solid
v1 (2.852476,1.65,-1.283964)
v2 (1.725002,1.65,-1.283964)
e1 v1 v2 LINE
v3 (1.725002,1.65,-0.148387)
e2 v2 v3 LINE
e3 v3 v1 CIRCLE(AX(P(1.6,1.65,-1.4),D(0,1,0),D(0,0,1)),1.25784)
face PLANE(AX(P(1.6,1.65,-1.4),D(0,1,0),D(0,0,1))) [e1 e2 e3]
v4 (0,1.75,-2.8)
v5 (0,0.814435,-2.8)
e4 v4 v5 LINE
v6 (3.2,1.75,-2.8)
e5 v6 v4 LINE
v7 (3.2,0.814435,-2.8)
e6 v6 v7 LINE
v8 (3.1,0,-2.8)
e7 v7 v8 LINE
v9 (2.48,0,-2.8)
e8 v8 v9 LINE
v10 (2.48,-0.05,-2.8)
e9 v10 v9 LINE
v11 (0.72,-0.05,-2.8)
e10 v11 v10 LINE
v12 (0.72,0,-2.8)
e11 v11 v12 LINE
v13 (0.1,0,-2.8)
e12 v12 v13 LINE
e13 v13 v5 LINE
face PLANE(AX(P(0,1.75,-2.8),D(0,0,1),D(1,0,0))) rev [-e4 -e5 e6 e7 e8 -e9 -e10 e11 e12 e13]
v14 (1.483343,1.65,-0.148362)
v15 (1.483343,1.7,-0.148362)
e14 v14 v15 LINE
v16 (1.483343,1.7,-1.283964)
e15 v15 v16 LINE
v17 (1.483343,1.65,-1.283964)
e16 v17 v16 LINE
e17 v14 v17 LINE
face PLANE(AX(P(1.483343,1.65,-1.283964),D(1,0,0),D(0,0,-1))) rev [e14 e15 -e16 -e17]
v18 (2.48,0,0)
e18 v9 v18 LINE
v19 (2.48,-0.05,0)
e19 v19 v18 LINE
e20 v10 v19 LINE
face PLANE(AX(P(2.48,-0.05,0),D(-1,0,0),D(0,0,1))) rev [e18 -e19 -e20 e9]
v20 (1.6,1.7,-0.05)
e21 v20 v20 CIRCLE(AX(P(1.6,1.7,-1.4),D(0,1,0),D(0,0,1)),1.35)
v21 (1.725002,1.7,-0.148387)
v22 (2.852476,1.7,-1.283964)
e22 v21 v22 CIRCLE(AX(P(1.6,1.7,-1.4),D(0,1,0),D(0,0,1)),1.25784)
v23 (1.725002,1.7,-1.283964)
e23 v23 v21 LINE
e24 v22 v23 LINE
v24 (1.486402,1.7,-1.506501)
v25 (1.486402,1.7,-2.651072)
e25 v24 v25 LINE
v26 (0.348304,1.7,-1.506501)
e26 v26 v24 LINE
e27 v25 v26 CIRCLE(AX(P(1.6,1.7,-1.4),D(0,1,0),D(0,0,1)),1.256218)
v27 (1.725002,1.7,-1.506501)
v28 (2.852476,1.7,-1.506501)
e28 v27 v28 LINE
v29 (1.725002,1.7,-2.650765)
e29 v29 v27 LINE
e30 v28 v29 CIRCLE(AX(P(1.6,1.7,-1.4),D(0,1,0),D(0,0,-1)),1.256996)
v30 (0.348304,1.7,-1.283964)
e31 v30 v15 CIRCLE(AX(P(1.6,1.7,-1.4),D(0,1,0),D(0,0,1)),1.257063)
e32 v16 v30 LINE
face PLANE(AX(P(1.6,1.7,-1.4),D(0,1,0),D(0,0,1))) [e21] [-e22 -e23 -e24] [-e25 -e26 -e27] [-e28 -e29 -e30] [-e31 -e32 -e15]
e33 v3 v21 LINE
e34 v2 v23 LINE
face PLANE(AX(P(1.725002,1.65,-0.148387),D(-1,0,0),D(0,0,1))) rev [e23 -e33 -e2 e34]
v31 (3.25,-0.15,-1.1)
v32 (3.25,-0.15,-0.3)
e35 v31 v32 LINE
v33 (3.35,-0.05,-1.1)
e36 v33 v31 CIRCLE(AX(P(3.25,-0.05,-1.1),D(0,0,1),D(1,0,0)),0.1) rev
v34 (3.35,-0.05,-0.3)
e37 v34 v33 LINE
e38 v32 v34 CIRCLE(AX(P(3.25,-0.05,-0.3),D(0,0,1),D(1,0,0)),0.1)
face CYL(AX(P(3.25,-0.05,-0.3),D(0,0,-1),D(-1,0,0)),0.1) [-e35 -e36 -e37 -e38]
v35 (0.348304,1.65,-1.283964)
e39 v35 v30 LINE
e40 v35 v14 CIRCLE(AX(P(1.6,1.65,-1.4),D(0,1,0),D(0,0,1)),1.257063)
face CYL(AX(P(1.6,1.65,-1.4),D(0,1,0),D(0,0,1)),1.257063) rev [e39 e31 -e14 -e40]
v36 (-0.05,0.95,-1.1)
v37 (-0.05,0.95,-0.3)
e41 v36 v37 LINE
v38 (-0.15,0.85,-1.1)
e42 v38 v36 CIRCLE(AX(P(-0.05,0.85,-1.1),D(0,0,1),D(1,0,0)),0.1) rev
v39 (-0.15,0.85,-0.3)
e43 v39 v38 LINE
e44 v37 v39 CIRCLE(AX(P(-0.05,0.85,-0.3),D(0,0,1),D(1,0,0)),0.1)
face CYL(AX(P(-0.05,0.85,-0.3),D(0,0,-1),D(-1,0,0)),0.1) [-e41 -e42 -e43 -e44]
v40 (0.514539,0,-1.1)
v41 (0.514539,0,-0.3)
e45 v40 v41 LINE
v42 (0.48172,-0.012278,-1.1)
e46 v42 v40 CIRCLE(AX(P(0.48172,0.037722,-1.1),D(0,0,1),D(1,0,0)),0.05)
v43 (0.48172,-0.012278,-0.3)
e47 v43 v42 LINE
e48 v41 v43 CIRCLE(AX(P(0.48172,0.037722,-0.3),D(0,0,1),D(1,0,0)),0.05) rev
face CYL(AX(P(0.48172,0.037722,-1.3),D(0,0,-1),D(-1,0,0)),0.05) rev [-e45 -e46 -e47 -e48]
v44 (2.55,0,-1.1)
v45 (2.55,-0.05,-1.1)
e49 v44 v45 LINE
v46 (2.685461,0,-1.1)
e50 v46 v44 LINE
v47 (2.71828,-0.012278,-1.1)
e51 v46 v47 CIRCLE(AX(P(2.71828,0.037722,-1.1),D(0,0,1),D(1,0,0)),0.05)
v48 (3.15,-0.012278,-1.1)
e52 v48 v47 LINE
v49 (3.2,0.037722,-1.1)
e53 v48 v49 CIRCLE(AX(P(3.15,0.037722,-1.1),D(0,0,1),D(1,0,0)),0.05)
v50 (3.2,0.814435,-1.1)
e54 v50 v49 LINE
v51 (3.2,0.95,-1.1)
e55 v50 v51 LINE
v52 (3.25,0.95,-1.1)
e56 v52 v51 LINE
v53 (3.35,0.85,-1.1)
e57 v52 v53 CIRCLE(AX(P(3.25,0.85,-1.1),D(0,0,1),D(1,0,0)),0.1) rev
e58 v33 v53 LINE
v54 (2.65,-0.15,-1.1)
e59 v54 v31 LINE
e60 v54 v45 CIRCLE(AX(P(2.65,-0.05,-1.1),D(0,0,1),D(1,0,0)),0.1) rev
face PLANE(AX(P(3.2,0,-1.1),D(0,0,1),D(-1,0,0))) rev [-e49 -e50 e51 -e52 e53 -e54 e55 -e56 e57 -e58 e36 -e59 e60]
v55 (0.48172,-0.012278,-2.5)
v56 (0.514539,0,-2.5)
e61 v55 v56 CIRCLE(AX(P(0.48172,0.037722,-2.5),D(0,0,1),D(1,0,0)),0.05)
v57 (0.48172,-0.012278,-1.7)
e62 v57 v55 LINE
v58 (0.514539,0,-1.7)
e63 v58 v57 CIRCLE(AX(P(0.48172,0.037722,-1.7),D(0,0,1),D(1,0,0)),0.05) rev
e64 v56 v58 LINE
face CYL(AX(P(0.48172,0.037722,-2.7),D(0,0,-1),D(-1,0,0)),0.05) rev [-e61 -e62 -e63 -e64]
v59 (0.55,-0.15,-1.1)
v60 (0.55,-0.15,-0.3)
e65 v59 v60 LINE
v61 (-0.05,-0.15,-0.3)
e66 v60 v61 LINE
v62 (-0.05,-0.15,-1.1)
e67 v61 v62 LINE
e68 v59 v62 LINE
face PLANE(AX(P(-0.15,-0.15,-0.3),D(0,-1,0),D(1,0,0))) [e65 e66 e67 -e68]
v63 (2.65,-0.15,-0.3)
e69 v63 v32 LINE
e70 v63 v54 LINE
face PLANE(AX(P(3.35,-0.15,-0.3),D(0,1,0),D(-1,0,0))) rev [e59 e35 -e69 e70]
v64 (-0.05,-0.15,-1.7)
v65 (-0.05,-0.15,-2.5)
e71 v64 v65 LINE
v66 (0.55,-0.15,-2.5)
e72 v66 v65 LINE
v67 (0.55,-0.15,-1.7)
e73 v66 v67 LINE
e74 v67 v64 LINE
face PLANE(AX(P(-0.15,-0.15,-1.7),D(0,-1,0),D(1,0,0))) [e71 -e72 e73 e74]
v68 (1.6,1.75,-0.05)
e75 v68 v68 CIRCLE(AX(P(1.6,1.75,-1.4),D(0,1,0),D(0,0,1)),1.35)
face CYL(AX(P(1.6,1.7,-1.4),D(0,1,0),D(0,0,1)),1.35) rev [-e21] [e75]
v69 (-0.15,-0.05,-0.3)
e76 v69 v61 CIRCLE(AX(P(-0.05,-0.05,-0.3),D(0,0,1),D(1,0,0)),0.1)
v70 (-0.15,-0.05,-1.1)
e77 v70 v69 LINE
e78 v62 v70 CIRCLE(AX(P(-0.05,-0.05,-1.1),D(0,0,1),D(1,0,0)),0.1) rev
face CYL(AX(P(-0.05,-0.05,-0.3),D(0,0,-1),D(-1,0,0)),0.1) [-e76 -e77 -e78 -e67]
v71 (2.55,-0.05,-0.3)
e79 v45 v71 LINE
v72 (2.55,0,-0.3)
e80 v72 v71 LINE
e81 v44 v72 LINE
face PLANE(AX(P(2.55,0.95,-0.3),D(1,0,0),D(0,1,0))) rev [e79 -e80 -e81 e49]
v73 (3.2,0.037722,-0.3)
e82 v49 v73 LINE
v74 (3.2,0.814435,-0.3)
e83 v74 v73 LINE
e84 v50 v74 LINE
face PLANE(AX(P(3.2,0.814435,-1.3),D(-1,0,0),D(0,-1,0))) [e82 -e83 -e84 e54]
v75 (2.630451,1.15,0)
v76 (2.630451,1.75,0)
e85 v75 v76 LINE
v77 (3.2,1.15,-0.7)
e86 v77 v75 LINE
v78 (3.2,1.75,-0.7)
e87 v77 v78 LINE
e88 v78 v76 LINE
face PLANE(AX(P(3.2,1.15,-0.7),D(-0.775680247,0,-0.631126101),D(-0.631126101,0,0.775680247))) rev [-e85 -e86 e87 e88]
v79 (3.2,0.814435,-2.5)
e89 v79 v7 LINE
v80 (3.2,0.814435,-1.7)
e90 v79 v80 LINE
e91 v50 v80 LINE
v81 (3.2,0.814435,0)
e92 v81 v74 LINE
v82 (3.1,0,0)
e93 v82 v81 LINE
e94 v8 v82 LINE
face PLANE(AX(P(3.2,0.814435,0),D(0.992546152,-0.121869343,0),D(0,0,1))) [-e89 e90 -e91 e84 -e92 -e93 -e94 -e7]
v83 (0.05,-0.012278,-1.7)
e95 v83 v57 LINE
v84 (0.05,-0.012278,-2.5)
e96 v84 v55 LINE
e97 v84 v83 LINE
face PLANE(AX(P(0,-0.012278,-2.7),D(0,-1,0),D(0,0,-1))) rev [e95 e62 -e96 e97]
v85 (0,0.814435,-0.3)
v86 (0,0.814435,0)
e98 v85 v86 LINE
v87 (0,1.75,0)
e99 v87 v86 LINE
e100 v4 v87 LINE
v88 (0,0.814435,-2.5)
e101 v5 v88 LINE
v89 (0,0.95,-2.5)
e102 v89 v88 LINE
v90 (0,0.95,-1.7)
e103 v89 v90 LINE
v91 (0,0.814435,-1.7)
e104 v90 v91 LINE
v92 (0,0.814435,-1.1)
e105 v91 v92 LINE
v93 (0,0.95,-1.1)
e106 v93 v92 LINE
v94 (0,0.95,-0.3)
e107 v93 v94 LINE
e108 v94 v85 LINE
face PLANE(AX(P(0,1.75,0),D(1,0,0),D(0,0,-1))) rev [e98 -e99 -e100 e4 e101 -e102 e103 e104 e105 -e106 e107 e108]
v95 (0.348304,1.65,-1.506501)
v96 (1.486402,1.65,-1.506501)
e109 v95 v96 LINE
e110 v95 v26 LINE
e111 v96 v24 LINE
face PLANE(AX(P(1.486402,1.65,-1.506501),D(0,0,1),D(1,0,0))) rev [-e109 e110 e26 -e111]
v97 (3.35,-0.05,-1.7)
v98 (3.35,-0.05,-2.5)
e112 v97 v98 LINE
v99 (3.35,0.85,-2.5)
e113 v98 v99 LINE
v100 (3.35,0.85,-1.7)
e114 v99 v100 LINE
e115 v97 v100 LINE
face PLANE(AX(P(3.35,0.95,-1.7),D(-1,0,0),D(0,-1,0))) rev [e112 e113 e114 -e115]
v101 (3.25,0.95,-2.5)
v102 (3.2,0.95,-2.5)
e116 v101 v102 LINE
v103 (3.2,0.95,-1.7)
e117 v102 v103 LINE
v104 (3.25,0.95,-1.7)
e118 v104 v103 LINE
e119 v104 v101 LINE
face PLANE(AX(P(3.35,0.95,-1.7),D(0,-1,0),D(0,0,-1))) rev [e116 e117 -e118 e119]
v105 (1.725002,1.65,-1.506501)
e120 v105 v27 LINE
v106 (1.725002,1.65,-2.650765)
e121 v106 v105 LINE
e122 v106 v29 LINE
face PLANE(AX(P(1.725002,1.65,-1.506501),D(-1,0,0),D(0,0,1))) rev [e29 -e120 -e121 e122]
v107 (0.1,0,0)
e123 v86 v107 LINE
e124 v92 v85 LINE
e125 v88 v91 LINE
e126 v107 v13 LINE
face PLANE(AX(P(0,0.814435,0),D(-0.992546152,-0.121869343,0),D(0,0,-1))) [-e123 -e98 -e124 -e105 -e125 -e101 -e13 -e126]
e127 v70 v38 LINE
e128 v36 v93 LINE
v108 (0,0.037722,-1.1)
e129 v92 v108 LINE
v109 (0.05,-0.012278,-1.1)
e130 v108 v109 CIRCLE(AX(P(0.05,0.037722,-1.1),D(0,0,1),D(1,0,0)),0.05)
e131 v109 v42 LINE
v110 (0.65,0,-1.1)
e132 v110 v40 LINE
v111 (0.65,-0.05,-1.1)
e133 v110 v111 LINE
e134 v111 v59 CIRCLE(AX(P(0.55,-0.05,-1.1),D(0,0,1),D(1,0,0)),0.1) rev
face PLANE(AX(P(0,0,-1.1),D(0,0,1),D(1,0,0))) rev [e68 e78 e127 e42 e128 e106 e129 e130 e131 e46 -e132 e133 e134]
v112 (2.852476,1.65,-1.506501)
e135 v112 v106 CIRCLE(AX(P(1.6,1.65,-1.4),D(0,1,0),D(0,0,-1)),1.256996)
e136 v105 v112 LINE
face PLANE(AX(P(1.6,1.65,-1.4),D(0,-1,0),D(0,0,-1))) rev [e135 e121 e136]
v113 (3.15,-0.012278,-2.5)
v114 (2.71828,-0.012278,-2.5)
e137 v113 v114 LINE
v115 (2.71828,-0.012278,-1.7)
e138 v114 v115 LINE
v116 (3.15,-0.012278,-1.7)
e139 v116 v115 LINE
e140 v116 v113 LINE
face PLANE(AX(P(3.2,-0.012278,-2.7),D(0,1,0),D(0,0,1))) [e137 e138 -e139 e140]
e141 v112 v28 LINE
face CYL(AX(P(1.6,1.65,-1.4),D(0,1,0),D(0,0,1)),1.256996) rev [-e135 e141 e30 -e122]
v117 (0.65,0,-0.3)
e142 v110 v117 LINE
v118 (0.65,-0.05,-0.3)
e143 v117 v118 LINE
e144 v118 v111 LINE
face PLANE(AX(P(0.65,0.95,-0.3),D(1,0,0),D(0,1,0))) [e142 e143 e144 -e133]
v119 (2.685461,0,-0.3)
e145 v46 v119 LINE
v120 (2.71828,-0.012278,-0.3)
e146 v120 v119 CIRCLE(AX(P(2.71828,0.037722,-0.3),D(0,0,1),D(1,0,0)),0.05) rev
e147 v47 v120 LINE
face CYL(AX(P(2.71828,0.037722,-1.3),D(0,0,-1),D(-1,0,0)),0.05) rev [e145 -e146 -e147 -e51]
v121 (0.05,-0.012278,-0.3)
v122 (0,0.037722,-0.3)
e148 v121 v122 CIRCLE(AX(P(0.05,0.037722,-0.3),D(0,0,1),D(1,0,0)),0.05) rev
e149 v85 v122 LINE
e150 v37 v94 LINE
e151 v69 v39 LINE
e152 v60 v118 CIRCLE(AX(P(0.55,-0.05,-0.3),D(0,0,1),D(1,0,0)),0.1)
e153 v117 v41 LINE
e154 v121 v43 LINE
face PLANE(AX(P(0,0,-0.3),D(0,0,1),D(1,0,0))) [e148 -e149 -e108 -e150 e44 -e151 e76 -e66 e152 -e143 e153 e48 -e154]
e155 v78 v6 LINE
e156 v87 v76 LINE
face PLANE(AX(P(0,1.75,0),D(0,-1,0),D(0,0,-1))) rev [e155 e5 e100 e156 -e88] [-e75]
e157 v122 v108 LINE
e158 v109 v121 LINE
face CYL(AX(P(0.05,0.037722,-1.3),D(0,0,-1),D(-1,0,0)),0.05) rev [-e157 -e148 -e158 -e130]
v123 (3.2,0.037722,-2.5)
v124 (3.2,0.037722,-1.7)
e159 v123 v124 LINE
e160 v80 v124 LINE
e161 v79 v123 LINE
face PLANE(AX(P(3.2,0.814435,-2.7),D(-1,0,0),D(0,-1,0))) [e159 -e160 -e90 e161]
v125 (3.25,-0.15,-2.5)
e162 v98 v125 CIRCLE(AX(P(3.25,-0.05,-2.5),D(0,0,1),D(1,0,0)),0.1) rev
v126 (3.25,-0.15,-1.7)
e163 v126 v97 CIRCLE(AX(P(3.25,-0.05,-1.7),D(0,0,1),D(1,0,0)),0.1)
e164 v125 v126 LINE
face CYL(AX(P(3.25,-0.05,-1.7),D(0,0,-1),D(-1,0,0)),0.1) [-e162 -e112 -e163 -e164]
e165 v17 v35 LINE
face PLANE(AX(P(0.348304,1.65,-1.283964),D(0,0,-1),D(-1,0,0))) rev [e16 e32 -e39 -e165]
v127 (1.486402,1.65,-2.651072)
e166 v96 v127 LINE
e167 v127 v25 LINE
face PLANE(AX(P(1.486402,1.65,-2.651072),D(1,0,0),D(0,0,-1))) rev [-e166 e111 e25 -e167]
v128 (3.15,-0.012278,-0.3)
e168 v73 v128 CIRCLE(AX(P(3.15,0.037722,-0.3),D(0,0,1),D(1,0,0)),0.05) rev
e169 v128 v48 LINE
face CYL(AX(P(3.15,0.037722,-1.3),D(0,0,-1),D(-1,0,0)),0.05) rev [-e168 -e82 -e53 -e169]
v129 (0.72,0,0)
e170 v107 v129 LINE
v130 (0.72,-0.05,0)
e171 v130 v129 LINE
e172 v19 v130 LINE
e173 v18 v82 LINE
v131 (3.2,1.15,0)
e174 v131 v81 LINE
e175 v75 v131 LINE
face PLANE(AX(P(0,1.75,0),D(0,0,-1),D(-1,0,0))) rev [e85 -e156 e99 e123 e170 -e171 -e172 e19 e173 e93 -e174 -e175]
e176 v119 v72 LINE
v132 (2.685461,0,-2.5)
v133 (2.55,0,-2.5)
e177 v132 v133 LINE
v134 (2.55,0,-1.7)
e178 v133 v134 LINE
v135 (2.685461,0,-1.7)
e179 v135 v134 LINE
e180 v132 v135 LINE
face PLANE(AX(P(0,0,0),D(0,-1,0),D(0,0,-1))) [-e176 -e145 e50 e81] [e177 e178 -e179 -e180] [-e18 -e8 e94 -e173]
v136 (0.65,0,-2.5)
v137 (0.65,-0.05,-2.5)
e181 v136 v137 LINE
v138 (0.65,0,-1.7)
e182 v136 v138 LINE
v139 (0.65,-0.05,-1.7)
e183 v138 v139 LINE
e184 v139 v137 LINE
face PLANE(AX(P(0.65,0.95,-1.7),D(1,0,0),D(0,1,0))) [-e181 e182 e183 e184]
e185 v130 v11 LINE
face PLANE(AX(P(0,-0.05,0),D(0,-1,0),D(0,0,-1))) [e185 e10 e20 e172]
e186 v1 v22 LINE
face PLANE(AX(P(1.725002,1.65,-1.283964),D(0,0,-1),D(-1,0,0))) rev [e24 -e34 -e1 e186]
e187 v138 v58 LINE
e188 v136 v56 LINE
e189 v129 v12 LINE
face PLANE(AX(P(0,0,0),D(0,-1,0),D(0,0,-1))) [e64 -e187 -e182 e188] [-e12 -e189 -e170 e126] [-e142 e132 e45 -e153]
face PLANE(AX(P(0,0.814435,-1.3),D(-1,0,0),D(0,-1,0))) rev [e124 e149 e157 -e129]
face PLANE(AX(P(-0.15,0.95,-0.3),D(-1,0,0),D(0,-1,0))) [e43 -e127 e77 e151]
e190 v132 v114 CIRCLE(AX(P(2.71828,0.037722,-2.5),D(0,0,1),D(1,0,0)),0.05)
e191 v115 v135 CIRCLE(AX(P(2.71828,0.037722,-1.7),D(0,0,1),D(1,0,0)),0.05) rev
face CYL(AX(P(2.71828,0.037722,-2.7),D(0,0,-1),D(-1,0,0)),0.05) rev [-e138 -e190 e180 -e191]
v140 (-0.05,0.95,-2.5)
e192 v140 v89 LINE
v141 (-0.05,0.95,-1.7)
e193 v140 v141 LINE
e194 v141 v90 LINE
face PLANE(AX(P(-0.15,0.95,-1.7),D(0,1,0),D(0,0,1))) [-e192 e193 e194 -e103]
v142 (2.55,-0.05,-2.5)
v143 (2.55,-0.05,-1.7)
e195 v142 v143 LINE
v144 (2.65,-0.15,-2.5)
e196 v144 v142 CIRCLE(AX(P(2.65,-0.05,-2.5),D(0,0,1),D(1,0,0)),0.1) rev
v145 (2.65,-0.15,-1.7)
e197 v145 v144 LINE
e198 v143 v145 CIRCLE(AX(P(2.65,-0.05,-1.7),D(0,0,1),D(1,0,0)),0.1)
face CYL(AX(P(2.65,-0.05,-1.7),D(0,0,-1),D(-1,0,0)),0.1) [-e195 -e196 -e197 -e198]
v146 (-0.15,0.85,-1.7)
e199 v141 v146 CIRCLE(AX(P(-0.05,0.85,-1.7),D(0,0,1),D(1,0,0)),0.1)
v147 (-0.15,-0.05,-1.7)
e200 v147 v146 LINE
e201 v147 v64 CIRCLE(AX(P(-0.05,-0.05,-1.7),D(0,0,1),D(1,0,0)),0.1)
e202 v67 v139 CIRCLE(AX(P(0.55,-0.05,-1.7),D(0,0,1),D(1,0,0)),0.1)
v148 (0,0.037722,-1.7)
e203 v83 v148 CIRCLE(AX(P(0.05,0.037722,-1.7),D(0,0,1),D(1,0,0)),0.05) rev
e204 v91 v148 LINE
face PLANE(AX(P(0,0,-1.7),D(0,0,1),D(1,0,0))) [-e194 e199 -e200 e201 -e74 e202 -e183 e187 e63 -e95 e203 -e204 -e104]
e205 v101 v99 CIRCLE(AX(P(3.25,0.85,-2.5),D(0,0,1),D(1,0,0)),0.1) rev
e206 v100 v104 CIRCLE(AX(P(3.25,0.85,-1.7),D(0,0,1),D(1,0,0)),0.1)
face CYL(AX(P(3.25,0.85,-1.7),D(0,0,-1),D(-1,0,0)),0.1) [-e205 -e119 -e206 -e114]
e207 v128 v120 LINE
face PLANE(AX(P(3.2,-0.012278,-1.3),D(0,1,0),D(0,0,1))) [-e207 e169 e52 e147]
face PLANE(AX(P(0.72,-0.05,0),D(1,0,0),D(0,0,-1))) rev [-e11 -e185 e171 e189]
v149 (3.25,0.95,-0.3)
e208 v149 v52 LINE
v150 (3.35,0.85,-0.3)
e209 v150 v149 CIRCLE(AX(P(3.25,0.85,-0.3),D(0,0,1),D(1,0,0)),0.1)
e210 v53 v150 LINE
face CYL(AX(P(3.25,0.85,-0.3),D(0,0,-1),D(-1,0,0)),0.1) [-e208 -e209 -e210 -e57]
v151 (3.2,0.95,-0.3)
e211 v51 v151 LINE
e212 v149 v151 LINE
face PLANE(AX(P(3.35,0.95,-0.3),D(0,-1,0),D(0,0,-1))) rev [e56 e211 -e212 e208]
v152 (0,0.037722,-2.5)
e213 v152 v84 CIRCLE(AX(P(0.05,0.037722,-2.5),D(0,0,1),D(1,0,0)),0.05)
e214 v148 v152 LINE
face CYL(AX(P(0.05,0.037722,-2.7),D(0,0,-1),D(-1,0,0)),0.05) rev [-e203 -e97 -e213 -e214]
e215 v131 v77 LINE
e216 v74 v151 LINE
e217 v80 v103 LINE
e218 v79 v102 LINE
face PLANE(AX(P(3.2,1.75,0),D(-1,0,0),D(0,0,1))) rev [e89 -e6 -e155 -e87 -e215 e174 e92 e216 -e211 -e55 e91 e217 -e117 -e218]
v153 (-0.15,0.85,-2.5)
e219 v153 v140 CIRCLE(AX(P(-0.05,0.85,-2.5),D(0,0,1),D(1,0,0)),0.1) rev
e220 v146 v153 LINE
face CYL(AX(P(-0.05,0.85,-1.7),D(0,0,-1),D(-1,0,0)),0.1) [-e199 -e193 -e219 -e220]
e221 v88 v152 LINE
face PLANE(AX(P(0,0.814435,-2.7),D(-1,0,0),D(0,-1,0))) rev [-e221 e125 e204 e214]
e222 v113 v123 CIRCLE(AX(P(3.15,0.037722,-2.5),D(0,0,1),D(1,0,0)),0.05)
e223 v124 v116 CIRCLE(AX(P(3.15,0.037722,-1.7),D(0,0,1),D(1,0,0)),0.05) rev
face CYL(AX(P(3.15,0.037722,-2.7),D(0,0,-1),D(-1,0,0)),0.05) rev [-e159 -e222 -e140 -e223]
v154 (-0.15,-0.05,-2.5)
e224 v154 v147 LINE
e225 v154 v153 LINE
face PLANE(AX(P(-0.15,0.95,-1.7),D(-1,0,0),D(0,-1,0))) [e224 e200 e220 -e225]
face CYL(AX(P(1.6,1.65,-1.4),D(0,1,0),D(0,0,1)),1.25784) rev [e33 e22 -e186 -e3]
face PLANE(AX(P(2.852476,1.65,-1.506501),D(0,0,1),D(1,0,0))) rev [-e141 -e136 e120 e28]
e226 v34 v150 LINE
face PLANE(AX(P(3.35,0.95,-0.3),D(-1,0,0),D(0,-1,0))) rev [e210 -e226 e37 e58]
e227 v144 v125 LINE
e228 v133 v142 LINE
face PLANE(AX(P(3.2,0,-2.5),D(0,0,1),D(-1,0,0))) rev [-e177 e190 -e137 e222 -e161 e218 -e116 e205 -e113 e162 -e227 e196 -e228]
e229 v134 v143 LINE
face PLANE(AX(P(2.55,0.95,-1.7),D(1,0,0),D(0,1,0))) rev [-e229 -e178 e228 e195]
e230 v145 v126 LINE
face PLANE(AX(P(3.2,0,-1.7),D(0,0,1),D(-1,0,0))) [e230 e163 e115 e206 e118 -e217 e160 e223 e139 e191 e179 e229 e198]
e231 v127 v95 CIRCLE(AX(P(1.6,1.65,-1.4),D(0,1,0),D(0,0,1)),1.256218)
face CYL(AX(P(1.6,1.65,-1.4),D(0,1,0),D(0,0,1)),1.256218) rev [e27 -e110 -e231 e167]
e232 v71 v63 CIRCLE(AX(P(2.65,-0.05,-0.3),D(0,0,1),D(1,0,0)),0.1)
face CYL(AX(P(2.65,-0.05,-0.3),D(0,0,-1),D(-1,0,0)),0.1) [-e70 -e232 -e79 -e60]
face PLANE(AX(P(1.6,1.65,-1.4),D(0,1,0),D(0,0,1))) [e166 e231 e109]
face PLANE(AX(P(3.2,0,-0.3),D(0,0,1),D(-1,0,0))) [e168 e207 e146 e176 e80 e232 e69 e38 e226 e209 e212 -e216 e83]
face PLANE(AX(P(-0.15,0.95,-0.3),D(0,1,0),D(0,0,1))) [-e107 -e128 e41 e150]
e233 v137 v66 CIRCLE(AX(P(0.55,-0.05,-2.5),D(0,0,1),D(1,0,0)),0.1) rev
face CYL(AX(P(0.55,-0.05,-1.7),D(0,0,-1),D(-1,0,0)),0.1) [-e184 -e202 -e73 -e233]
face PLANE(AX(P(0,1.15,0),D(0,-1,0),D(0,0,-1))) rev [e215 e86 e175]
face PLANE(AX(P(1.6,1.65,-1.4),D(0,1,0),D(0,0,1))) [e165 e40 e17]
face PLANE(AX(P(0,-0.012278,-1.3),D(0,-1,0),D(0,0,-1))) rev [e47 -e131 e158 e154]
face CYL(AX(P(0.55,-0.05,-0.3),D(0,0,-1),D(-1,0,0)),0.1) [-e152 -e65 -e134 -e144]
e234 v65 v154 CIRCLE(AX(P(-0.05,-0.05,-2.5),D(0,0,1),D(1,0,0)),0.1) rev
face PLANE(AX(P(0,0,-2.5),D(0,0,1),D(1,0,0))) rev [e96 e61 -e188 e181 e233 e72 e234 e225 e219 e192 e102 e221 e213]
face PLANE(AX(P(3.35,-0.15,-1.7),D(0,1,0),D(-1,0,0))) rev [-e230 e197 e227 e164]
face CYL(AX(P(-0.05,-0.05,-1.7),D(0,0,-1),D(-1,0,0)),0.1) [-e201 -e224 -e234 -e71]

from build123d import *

# Parameters (mm, degrees)
SKETCH1_W              = 3.2
SKETCH1_H              = 2.8
BOSS_EXTRUDE1_DEPTH    = 1.75
CHAMFER1_SIZE          = 0.1
CHAMFER1_SIZE2         = 0.814434643
SKETCH3_W              = 0.8
SKETCH3_H              = 1.1
BOSS_EXTRUDE2_DEPTH    = 0.8
FILLET1_R              = 0.1
FILLET2_R              = 0.1
FILLET3_R              = 0.1
CUT_EXTRUDE3_DEPTH     = 1
FILLET5_R              = 0.05
FILLET6_R              = 0.05
LPATTERN1_COUNT        = 2
LPATTERN1_PITCH        = 1.4
FILLET1_OF_LPATTERN1_R = 0.1
FILLET2_OF_LPATTERN1_R = 0.1
FILLET3_OF_LPATTERN1_R = 0.1
FILLET5_OF_LPATTERN1_R = 0.05
FILLET6_OF_LPATTERN1_R = 0.05
CHAMFER2_SIZE          = 0.1
CHAMFER2_SIZE2         = 0.814434643
MIRROR2_START          = -2.5
MIRROR2_DEPTH          = 0.8
MIRROR2_START_2        = -1.1
MIRROR2_2_DEPTH        = 0.8
SKETCH7_W              = 1.76
SKETCH7_H              = 2.8
BOSS_EXTRUDE4_DEPTH    = 0.05
CUT_EXTRUDE4_DEPTH     = 0.6
SKETCH9_R              = 1.35
CUT_EXTRUDE5_DEPTH     = 0.05
CUT_EXTRUDE6_DEPTH     = 0.05


# Read off the part's stored shape, not the designer's step: Mirror2
with BuildPart() as part:
    # Sketch1 → Boss-Extrude1 (new body)
    with BuildSketch(Plane(origin=(0, 0, 0), x_dir=(1, 0, 0), z_dir=(0, 1, 0))):
        with Locations((1.6, 1.4)):
            Rectangle(SKETCH1_W, SKETCH1_H)
    extrude(amount=BOSS_EXTRUDE1_DEPTH)

    # Chamfer1
    chamfer1_edges = [part.edges().sort_by_distance(p)[0] for p in [
        (0, 0, -1.4),
    ]]
    chamfer1_side = [part.faces().sort_by_distance(p)[0] for p in [
        (1.6, 0, -1.4),
    ]]
    chamfer(chamfer1_edges, length=CHAMFER1_SIZE, length2=CHAMFER1_SIZE2, reference=chamfer1_side[0])

    # Sketch3 → Boss-Extrude2 (add)
    with BuildSketch(Plane(origin=(0, 0, -2.5), x_dir=(-1, 0, 0), z_dir=(0, 0, -1))):
        with Locations((-0.25, 0.4)):
            Rectangle(SKETCH3_W, SKETCH3_H)
    boss_extrude2 = extrude(amount=-BOSS_EXTRUDE2_DEPTH)

    # Fillet1
    fillet1_edges = [part.edges().sort_by_distance(p)[0] for p in [
        (-0.15, 0.95, -2.1),
    ]]
    fillet(fillet1_edges, radius=FILLET1_R)

    # Fillet2
    fillet2_edges = [part.edges().sort_by_distance(p)[0] for p in [
        (-0.15, -0.15, -2.1),
    ]]
    fillet(fillet2_edges, radius=FILLET2_R)

    # Fillet3
    fillet3_edges = [part.edges().sort_by_distance(p)[0] for p in [
        (0.65, -0.15, -2.1),
    ]]
    fillet(fillet3_edges, radius=FILLET3_R)

    # Sketch6 → Cut-Extrude3 (cut)
    with BuildSketch(Plane.XY.offset(-1.7)):
        Polygon((0, 0.814434643), (0, -0.012278456), (0.514539268, -0.012278456), (0.514539268, 0), (0.1, 0), align=None)
    cut_extrude3 = extrude(amount=-CUT_EXTRUDE3_DEPTH, mode=Mode.SUBTRACT)

    # Fillet5
    fillet5_edges = [part.edges().sort_by_distance(p)[0] for p in [
        (0, -0.012278456, -2.1),
    ]]
    fillet(fillet5_edges, radius=FILLET5_R)

    # Fillet6
    # the kernel refuses this fillet: 0.05 mm, written as the material it adds along each edge
    with BuildSketch(Plane(origin=(0.514539268, -0.012278456, -1.7), x_dir=(-1, 0, 0), z_dir=(0, 0, -1))) as fillet6_piece_1:
        with BuildLine():
            CenterArc((0.032818975, 0.05), FILLET6_R, 228.975665985, 41.024334015)
            Line((0, 0.012278456), (-0.00065638, 0.011524025))
            ThreePointArc((-0.00065638, 0.011524025), (-0.001, 0.006139228), (-0.001, 0))
            Line((-0.001, 0), (0, -0.001))
            Line((0, -0.001), (0.032818975, -0.001))
            Line((0.032818975, -0.001), (0.032818975, 0))
        make_face()
    extrude(amount=0.8)

    # LPattern1: Boss-Extrude2, Cut-Extrude3 ×2
    with Locations(*[(0, 0, i * LPATTERN1_PITCH) for i in range(1, LPATTERN1_COUNT)]):
        add(boss_extrude2)
        add(cut_extrude3, mode=Mode.SUBTRACT)

    # Fillet1 of LPattern1
    fillet1_of_lpattern1_edges = [part.edges().sort_by_distance(p)[0] for p in [
        (-0.15, 0.95, -0.7),
    ]]
    fillet(fillet1_of_lpattern1_edges, radius=FILLET1_OF_LPATTERN1_R)

    # Fillet2 of LPattern1
    fillet2_of_lpattern1_edges = [part.edges().sort_by_distance(p)[0] for p in [
        (-0.15, -0.15, -0.7),
    ]]
    fillet(fillet2_of_lpattern1_edges, radius=FILLET2_OF_LPATTERN1_R)

    # Fillet3 of LPattern1
    fillet3_of_lpattern1_edges = [part.edges().sort_by_distance(p)[0] for p in [
        (0.65, -0.15, -0.7),
    ]]
    fillet(fillet3_of_lpattern1_edges, radius=FILLET3_OF_LPATTERN1_R)

    # Fillet5 of LPattern1
    fillet5_of_lpattern1_edges = [part.edges().sort_by_distance(p)[0] for p in [
        (0, -0.012278456, -0.7),
    ]]
    fillet(fillet5_of_lpattern1_edges, radius=FILLET5_OF_LPATTERN1_R)

    # Fillet6 of LPattern1
    # the kernel refuses this fillet: 0.05 mm, written as the material it adds along each edge
    with BuildSketch(Plane(origin=(0.514539268, -0.012278456, -0.3), x_dir=(-1, 0, 0), z_dir=(0, 0, -1))) as fillet6_of_lpattern1_piece_1:
        with BuildLine():
            CenterArc((0.032818975, 0.05), FILLET6_OF_LPATTERN1_R, 228.975665985, 41.024334015)
            Line((0, 0.012278456), (-0.00065638, 0.011524025))
            ThreePointArc((-0.00065638, 0.011524025), (-0.001, 0.006139228), (-0.001, 0))
            Line((-0.001, 0), (0, -0.001))
            Line((0, -0.001), (0.032818975, -0.001))
            Line((0.032818975, -0.001), (0.032818975, 0))
        make_face()
    extrude(amount=0.8)

    # Chamfer2
    chamfer2_edges = [part.edges().sort_by_distance(p)[0] for p in [
        (3.2, 0, -1.4),
    ]]
    chamfer2_side = [part.faces().sort_by_distance(p)[0] for p in [
        (1.677343693, 0, -1.4),
    ]]
    chamfer(chamfer2_edges, length=CHAMFER2_SIZE, length2=CHAMFER2_SIZE2, reference=chamfer2_side[0])

    # Mirror2 outline → Mirror2 (add)
    with BuildSketch(Plane.XY.offset(MIRROR2_START)):
        with BuildLine():
            Line((3.25, 0.95), (3.2, 0.95))
            Line((3.2, 0.95), (3.2, 0.037721544))
            ThreePointArc((3.2, 0.037721544), (3.185355339, 0.002366205), (3.15, -0.012278456))
            Line((3.15, -0.012278456), (2.718279707, -0.012278456))
            ThreePointArc((2.718279707, -0.012278456), (2.700759393, -0.009108346), (2.685460732, 0))
            Line((2.685460732, 0), (2.55, 0))
            Line((2.55, 0), (2.55, -0.05))
            ThreePointArc((2.55, -0.05), (2.579289322, -0.120710678), (2.65, -0.15))
            Line((2.65, -0.15), (3.25, -0.15))
            ThreePointArc((3.25, -0.15), (3.320710678, -0.120710678), (3.35, -0.05))
            Line((3.35, -0.05), (3.35, 0.85))
            ThreePointArc((3.35, 0.85), (3.320710678, 0.920710678), (3.25, 0.95))
        make_face()
    extrude(amount=MIRROR2_DEPTH)

    # Mirror2 2 outline → Mirror2 2 (add)
    with BuildSketch(Plane.XY.offset(MIRROR2_START_2)):
        with BuildLine():
            Line((3.25, 0.95), (3.2, 0.95))
            Line((3.2, 0.95), (3.2, 0.037721544))
            ThreePointArc((3.2, 0.037721544), (3.185355339, 0.002366205), (3.15, -0.012278456))
            Line((3.15, -0.012278456), (2.718279707, -0.012278456))
            ThreePointArc((2.718279707, -0.012278456), (2.700759393, -0.009108346), (2.685460732, 0))
            Line((2.685460732, 0), (2.55, 0))
            Line((2.55, 0), (2.55, -0.05))
            ThreePointArc((2.55, -0.05), (2.579289322, -0.120710678), (2.65, -0.15))
            Line((2.65, -0.15), (3.25, -0.15))
            ThreePointArc((3.25, -0.15), (3.320710678, -0.120710678), (3.35, -0.05))
            Line((3.35, -0.05), (3.35, 0.85))
            ThreePointArc((3.35, 0.85), (3.320710678, 0.920710678), (3.25, 0.95))
        make_face()
    extrude(amount=MIRROR2_2_DEPTH)

    # Sketch7 → Boss-Extrude4 (add)
    with BuildSketch(Plane.XZ):
        with Locations((1.6, -1.4)):
            Rectangle(SKETCH7_W, SKETCH7_H)
    extrude(amount=BOSS_EXTRUDE4_DEPTH)

    # Sketch8 → Cut-Extrude4 (cut)
    with BuildSketch(Plane(origin=(0, 1.75, 0), x_dir=(1, 0, 0), z_dir=(0, 1, 0))):
        Polygon((3.2, 0.7), (2.630450534, 0), (3.2, 0), align=None)
    extrude(amount=-CUT_EXTRUDE4_DEPTH, mode=Mode.SUBTRACT)

    # Sketch9 → Cut-Extrude5 (cut)
    with BuildSketch(Plane(origin=(0, 1.75, 0), x_dir=(1, 0, 0), z_dir=(0, 1, 0))):
        with Locations(Location((1.6, 1.4, 0), (0, 0, 270))):
            Circle(SKETCH9_R)
    extrude(amount=-CUT_EXTRUDE5_DEPTH, mode=Mode.SUBTRACT)

    # Sketch10 → Cut-Extrude6 (cut)
    with BuildSketch(Plane(origin=(0, 1.7, 0), x_dir=(1, 0, 0), z_dir=(0, 1, 0))):
        with BuildLine():
            Line((1.725002215, 1.506501375), (1.725002215, 2.650765477))
            ThreePointArc((1.725002215, 2.650765477), (2.495375318, 2.282237423), (2.852476462, 1.506501375))
            Line((2.852476462, 1.506501375), (1.725002215, 1.506501375))
        make_face()
        with BuildLine():
            Line((0.348304372, 1.283963542), (1.483343314, 1.283963542))
            Line((1.483343314, 1.283963542), (1.483343314, 0.148362024))
            ThreePointArc((1.483343314, 0.148362024), (0.710902302, 0.511342761), (0.348304372, 1.283963542))
        make_face()
        with BuildLine():
            Line((1.725002215, 0.148386564), (1.725002215, 1.283963542))
            Line((1.725002215, 1.283963542), (2.852476462, 1.283963542))
            ThreePointArc((2.852476462, 1.283963542), (2.492606098, 0.513762954), (1.725002215, 0.148386564))
        make_face()
        with BuildLine():
            Line((1.486402288, 2.65107156), (1.486402288, 1.506501375))
            Line((1.486402288, 1.506501375), (0.348304372, 1.506501375))
            ThreePointArc((0.348304372, 1.506501375), (0.709204455, 2.285758311), (1.486402288, 2.65107156))
        make_face()
    extrude(amount=-CUT_EXTRUDE6_DEPTH, mode=Mode.SUBTRACT)


solid = part.part
